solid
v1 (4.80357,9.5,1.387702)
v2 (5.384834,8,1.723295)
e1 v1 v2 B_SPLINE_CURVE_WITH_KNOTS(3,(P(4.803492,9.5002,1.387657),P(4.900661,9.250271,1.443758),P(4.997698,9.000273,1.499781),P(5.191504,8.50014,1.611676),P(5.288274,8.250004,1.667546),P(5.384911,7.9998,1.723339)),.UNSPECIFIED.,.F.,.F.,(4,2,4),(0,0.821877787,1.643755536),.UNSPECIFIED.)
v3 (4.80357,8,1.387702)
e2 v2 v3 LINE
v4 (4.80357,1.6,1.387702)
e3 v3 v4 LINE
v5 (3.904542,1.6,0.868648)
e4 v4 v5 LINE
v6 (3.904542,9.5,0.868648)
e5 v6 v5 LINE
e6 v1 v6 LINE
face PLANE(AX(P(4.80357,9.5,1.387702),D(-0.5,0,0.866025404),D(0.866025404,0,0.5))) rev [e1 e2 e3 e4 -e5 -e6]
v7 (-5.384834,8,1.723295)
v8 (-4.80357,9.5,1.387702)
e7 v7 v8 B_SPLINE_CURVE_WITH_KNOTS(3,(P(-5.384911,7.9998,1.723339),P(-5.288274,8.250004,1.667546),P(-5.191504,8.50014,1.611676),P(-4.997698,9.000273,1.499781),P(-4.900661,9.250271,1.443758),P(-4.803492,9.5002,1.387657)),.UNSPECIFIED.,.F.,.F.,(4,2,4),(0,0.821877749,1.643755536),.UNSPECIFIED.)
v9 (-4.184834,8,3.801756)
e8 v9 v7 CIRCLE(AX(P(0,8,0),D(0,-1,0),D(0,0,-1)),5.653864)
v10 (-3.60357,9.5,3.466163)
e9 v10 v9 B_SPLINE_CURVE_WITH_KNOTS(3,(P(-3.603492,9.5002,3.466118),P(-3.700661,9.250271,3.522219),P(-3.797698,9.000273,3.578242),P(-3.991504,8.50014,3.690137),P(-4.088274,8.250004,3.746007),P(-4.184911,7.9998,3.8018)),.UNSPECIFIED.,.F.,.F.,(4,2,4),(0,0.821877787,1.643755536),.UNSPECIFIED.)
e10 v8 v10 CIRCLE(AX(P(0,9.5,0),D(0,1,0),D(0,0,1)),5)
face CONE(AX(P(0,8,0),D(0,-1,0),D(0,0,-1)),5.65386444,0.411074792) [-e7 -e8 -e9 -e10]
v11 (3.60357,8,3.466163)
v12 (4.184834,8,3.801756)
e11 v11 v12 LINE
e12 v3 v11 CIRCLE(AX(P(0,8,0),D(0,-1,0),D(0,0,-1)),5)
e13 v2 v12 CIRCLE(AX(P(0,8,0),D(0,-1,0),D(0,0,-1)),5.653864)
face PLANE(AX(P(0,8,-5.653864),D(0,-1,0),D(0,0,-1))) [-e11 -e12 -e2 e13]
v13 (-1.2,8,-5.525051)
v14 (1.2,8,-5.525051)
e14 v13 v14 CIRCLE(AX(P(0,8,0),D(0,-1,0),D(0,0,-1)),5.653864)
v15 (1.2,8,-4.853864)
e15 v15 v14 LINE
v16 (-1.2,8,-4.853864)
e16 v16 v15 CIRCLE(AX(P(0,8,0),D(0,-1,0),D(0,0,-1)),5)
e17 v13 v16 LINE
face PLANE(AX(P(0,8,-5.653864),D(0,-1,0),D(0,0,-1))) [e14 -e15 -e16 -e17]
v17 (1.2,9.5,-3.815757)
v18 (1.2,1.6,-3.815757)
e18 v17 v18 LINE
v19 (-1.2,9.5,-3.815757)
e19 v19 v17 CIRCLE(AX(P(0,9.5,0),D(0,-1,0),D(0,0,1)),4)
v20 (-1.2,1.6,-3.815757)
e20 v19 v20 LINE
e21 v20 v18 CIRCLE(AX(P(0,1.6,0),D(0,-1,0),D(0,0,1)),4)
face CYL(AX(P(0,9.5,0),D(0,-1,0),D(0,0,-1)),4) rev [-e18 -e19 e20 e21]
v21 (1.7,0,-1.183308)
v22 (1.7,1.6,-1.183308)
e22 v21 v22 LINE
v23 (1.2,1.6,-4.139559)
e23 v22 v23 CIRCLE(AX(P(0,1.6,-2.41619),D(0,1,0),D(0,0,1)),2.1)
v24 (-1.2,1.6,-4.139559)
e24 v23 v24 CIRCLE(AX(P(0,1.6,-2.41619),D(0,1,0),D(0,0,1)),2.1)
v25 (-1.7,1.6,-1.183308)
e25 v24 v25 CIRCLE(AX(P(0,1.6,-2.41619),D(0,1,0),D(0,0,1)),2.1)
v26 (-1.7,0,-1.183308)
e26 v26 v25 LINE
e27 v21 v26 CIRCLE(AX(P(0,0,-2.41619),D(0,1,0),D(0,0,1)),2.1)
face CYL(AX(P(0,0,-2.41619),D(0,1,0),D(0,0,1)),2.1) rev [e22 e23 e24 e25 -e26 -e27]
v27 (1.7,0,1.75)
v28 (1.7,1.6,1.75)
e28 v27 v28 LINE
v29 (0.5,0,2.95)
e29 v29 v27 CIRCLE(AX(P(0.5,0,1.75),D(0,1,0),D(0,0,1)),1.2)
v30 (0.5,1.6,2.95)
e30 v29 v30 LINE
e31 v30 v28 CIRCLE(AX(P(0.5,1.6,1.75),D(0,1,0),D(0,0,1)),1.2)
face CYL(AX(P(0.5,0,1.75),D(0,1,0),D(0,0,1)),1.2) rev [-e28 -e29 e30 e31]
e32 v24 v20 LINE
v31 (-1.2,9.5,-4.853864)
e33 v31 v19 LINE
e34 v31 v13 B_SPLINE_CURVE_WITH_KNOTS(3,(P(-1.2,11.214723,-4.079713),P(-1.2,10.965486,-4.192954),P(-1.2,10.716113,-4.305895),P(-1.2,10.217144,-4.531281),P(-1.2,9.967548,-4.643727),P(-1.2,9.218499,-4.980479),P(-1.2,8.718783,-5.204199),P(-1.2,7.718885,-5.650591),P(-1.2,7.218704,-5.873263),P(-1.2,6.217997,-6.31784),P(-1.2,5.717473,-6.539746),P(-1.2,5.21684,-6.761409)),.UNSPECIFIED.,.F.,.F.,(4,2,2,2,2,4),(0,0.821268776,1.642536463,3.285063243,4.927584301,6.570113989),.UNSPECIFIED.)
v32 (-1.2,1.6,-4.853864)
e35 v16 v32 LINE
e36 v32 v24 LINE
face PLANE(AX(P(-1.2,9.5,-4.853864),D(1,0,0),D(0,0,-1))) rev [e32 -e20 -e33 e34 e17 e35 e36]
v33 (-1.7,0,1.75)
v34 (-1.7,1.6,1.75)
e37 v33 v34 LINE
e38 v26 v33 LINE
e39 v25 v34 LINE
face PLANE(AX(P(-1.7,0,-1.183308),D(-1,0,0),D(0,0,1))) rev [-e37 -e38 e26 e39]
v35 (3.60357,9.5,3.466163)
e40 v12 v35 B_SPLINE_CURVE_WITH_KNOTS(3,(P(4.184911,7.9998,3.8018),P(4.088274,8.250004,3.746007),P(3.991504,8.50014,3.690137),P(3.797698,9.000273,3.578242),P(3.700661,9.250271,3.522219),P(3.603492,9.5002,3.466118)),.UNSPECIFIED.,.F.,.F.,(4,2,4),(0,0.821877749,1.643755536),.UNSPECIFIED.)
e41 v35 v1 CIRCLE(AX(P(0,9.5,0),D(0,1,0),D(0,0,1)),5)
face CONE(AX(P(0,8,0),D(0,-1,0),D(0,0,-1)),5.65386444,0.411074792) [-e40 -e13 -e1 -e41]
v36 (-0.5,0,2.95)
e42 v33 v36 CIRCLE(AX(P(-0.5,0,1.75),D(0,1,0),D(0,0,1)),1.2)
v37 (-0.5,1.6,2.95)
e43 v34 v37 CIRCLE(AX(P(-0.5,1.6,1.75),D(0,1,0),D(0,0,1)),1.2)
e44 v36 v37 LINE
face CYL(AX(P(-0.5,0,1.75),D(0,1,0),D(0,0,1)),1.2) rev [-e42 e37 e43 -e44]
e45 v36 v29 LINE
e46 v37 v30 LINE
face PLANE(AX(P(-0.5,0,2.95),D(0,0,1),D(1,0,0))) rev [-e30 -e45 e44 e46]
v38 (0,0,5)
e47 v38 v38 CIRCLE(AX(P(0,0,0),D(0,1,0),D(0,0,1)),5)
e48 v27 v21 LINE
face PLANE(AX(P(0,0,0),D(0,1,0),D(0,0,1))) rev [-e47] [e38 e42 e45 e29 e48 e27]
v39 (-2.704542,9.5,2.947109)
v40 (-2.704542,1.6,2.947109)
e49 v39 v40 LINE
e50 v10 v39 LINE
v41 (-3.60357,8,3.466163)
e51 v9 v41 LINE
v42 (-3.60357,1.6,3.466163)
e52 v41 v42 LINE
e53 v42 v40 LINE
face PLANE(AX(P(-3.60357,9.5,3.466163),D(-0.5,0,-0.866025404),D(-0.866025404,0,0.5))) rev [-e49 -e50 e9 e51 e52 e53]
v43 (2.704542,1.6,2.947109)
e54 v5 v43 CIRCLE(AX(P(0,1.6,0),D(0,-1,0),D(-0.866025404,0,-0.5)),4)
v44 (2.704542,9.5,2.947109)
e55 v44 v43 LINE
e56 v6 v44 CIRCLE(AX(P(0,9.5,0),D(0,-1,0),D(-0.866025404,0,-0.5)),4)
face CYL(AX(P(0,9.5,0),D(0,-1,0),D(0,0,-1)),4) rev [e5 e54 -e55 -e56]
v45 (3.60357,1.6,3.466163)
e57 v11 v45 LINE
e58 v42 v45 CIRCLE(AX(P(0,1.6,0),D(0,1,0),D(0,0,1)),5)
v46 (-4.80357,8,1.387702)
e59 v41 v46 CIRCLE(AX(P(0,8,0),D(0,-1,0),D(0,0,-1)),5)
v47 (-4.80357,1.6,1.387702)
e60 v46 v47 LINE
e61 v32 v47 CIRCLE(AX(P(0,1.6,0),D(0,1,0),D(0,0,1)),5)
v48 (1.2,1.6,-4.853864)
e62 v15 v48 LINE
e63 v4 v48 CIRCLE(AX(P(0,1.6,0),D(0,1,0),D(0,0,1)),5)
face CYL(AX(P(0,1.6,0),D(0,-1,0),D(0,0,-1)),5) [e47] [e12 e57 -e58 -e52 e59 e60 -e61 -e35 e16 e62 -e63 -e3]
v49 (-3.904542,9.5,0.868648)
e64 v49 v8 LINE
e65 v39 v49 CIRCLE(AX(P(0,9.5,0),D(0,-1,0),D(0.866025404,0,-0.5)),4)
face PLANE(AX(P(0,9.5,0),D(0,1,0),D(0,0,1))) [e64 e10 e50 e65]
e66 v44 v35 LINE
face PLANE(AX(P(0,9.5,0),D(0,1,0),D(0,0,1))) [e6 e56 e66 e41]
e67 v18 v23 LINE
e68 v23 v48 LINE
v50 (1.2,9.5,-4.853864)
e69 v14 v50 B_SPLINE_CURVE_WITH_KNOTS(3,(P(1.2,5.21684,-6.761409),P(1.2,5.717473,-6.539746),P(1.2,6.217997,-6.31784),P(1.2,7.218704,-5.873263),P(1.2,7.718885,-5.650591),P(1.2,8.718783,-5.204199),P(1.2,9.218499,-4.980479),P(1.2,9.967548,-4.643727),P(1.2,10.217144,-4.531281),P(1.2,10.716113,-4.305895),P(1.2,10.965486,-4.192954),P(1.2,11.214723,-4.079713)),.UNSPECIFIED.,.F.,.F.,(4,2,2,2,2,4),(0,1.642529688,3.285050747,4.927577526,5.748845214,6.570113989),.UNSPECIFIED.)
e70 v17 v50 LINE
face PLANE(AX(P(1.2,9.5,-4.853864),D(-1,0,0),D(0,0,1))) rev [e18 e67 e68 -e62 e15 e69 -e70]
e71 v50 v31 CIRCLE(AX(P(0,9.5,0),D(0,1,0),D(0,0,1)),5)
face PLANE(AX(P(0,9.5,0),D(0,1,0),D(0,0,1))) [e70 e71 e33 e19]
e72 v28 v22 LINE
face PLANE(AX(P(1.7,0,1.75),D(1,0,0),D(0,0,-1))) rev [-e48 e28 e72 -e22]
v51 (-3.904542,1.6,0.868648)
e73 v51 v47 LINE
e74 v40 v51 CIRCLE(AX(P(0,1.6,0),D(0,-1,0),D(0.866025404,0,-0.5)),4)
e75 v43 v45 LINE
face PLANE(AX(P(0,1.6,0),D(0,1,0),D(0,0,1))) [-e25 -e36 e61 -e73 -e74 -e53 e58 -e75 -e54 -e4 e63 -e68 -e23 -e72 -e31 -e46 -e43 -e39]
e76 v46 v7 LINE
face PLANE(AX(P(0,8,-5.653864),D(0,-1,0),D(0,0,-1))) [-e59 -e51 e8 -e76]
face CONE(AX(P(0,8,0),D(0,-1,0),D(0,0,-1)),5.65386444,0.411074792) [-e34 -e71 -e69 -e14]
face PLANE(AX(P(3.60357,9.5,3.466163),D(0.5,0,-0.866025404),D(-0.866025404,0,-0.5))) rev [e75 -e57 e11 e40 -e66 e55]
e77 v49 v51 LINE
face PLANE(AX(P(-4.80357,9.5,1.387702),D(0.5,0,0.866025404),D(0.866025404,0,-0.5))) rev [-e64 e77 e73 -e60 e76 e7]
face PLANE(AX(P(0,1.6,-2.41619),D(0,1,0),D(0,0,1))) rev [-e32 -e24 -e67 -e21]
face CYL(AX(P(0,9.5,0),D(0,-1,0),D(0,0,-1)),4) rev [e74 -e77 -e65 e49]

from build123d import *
from build123d.topology import SkipClean

# Parameters (mm, degrees)
SKETCH1_R           = 5
BOSS_EXTRUDE1_DEPTH = 1.6
BOSS_EXTRUDE2_DEPTH = 7.9
CIRPATTERN3_COUNT   = 3
CUT_EXTRUDE2_DEPTH  = 12.240212189
CUT_EXTRUDE3_DEPTH  = 12.310719255
CUT_EXTRUDE4_DEPTH  = 12.10732297


with BuildPart() as part:
    # Sketch1 → Boss-Extrude1 (new body)
    with BuildSketch(Plane(origin=(0, 0, 0), x_dir=(1, 0, 0), z_dir=(0, 1, 0))):
        Circle(SKETCH1_R)
    extrude(amount=BOSS_EXTRUDE1_DEPTH)

    # Sketch2 → Boss-Extrude2 (add)
    with BuildSketch(Plane(origin=(0, 1.6, 0), x_dir=(1, 0, 0), z_dir=(0, 1, 0))):
        with BuildLine():
            Line((-1.2, 4.85386444), (-1.2, 3.815756806))
            ThreePointArc((-1.2, 3.815756806), (0, 4), (1.2, 3.815756806))
            Line((1.2, 3.815756806), (1.2, 4.85386444))
            ThreePointArc((1.2, 4.85386444), (0, 5), (-1.2, 4.85386444))
        make_face()
    boss_extrude2 = extrude(amount=BOSS_EXTRUDE2_DEPTH)

    # CirPattern3: Boss-Extrude2 ×3 about axis
    cirpattern3_axis = Axis((0, 1.6, 0), (0, -1, 0))
    for i in range(1, CIRPATTERN3_COUNT):
        add(boss_extrude2.rotate(cirpattern3_axis, i * 360 / CIRPATTERN3_COUNT))

    # Sweep3: sweep along a path in Sketch6
    with SkipClean():  # the faces are left unmerged after this step: merging them gives an invalid solid
        with BuildLine(Plane(origin=(0, 9.5, 0), x_dir=(1, 0, 0), z_dir=(0, 1, 0))) as sweep3_path:
            CenterArc((0, 0), 5, 0, 360)
        # Sketch3 → Sweep3 (sweep)
        with BuildSketch(Plane(origin=(0, 0, 0), x_dir=(0, 0, -1), z_dir=(1, 0, 0))):
            Polygon((5, 9.5), (5.65386444, 8), (4.85386444, 8), (4.85386444, 9.5), align=None)
        sweep(path=sweep3_path.line)
    add(part.part.scale(1), mode=Mode.REPLACE)  # the faces are merged on a copy

    # Sketch7 → Cut-Extrude2 (cut, through all)
    with BuildSketch(Plane(origin=(0, 1.6, 0), x_dir=(1, 0, 0), z_dir=(0, 1, 0))):
        with BuildLine():
            Line((-3.904542328, -0.868647918), (-4.803569911, -1.387701735))
            ThreePointArc((-4.803569911, -1.387701735), (-4.330127019, 2.5), (-1.2, 4.85386444))
            Line((-1.2, 4.85386444), (-1.2, 3.815756806))
            ThreePointArc((-1.2, 3.815756806), (0, 4), (1.2, 3.815756806))
            Line((1.2, 3.815756806), (1.2, 4.85386444))
            ThreePointArc((1.2, 4.85386444), (4.330127019, 2.5), (4.803569911, -1.387701735))
            Line((4.803569911, -1.387701735), (3.904542328, -0.868647918))
            ThreePointArc((3.904542328, -0.868647918), (3.464101615, -2), (2.704542328, -2.947108887))
            Line((2.704542328, -2.947108887), (3.603569911, -3.466162704))
            ThreePointArc((3.603569911, -3.466162704), (0, -5), (-3.603569911, -3.466162704))
            Line((-3.603569911, -3.466162704), (-2.704542328, -2.947108887))
            ThreePointArc((-2.704542328, -2.947108887), (-3.464101615, -2), (-3.904542328, -0.868647918))
        make_face()
    extrude(amount=CUT_EXTRUDE2_DEPTH, mode=Mode.SUBTRACT)

    # Sketch8 → Cut-Extrude3 (cut, through all)
    with BuildSketch(Plane.XZ.offset(-8)):
        with BuildLine():
            Line((-3.603569911, 3.466162704), (-4.184834096, 3.801755738))
            ThreePointArc((-4.184834096, 3.801755738), (0, 5.65386444), (4.184834096, 3.801755738))
            Line((4.184834096, 3.801755738), (3.603569911, 3.466162704))
            ThreePointArc((3.603569911, 3.466162704), (0, 5), (-3.603569911, 3.466162704))
        make_face()
        with BuildLine():
            Line((-5.384834096, 1.723294769), (-4.803569911, 1.387701735))
            ThreePointArc((-4.803569911, 1.387701735), (-4.330127019, -2.5), (-1.2, -4.85386444))
            Line((-1.2, -4.85386444), (-1.2, -5.525050507))
            ThreePointArc((-1.2, -5.525050507), (-4.896390234, -2.82693222), (-5.384834096, 1.723294769))
        make_face()
        with BuildLine():
            Line((1.2, -5.525050507), (1.2, -4.85386444))
            ThreePointArc((1.2, -4.85386444), (4.330127019, -2.5), (4.803569911, 1.387701735))
            Line((4.803569911, 1.387701735), (5.384834096, 1.723294769))
            ThreePointArc((5.384834096, 1.723294769), (4.896390234, -2.82693222), (1.2, -5.525050507))
        make_face()
    extrude(amount=-CUT_EXTRUDE3_DEPTH, mode=Mode.SUBTRACT)

    # Sketch9 → Cut-Extrude4 (cut, through all)
    with BuildSketch(Plane(origin=(0, 1.6, 0), x_dir=(1, 0, 0), z_dir=(0, 1, 0))):
        with BuildLine():
            Line((-1.7, 1.183307578), (-1.7, -1.75))
            ThreePointArc((-1.7, -1.75), (-1.348528137, -2.598528137), (-0.5, -2.95))
            Line((-0.5, -2.95), (0.5, -2.95))
            ThreePointArc((0.5, -2.95), (1.348528137, -2.598528137), (1.7, -1.75))
            Line((1.7, -1.75), (1.7, 1.183307578))
            ThreePointArc((1.7, 1.183307578), (0, 4.516190379), (-1.7, 1.183307578))
        make_face()
    extrude(amount=-CUT_EXTRUDE4_DEPTH, mode=Mode.SUBTRACT)


solid = part.part
